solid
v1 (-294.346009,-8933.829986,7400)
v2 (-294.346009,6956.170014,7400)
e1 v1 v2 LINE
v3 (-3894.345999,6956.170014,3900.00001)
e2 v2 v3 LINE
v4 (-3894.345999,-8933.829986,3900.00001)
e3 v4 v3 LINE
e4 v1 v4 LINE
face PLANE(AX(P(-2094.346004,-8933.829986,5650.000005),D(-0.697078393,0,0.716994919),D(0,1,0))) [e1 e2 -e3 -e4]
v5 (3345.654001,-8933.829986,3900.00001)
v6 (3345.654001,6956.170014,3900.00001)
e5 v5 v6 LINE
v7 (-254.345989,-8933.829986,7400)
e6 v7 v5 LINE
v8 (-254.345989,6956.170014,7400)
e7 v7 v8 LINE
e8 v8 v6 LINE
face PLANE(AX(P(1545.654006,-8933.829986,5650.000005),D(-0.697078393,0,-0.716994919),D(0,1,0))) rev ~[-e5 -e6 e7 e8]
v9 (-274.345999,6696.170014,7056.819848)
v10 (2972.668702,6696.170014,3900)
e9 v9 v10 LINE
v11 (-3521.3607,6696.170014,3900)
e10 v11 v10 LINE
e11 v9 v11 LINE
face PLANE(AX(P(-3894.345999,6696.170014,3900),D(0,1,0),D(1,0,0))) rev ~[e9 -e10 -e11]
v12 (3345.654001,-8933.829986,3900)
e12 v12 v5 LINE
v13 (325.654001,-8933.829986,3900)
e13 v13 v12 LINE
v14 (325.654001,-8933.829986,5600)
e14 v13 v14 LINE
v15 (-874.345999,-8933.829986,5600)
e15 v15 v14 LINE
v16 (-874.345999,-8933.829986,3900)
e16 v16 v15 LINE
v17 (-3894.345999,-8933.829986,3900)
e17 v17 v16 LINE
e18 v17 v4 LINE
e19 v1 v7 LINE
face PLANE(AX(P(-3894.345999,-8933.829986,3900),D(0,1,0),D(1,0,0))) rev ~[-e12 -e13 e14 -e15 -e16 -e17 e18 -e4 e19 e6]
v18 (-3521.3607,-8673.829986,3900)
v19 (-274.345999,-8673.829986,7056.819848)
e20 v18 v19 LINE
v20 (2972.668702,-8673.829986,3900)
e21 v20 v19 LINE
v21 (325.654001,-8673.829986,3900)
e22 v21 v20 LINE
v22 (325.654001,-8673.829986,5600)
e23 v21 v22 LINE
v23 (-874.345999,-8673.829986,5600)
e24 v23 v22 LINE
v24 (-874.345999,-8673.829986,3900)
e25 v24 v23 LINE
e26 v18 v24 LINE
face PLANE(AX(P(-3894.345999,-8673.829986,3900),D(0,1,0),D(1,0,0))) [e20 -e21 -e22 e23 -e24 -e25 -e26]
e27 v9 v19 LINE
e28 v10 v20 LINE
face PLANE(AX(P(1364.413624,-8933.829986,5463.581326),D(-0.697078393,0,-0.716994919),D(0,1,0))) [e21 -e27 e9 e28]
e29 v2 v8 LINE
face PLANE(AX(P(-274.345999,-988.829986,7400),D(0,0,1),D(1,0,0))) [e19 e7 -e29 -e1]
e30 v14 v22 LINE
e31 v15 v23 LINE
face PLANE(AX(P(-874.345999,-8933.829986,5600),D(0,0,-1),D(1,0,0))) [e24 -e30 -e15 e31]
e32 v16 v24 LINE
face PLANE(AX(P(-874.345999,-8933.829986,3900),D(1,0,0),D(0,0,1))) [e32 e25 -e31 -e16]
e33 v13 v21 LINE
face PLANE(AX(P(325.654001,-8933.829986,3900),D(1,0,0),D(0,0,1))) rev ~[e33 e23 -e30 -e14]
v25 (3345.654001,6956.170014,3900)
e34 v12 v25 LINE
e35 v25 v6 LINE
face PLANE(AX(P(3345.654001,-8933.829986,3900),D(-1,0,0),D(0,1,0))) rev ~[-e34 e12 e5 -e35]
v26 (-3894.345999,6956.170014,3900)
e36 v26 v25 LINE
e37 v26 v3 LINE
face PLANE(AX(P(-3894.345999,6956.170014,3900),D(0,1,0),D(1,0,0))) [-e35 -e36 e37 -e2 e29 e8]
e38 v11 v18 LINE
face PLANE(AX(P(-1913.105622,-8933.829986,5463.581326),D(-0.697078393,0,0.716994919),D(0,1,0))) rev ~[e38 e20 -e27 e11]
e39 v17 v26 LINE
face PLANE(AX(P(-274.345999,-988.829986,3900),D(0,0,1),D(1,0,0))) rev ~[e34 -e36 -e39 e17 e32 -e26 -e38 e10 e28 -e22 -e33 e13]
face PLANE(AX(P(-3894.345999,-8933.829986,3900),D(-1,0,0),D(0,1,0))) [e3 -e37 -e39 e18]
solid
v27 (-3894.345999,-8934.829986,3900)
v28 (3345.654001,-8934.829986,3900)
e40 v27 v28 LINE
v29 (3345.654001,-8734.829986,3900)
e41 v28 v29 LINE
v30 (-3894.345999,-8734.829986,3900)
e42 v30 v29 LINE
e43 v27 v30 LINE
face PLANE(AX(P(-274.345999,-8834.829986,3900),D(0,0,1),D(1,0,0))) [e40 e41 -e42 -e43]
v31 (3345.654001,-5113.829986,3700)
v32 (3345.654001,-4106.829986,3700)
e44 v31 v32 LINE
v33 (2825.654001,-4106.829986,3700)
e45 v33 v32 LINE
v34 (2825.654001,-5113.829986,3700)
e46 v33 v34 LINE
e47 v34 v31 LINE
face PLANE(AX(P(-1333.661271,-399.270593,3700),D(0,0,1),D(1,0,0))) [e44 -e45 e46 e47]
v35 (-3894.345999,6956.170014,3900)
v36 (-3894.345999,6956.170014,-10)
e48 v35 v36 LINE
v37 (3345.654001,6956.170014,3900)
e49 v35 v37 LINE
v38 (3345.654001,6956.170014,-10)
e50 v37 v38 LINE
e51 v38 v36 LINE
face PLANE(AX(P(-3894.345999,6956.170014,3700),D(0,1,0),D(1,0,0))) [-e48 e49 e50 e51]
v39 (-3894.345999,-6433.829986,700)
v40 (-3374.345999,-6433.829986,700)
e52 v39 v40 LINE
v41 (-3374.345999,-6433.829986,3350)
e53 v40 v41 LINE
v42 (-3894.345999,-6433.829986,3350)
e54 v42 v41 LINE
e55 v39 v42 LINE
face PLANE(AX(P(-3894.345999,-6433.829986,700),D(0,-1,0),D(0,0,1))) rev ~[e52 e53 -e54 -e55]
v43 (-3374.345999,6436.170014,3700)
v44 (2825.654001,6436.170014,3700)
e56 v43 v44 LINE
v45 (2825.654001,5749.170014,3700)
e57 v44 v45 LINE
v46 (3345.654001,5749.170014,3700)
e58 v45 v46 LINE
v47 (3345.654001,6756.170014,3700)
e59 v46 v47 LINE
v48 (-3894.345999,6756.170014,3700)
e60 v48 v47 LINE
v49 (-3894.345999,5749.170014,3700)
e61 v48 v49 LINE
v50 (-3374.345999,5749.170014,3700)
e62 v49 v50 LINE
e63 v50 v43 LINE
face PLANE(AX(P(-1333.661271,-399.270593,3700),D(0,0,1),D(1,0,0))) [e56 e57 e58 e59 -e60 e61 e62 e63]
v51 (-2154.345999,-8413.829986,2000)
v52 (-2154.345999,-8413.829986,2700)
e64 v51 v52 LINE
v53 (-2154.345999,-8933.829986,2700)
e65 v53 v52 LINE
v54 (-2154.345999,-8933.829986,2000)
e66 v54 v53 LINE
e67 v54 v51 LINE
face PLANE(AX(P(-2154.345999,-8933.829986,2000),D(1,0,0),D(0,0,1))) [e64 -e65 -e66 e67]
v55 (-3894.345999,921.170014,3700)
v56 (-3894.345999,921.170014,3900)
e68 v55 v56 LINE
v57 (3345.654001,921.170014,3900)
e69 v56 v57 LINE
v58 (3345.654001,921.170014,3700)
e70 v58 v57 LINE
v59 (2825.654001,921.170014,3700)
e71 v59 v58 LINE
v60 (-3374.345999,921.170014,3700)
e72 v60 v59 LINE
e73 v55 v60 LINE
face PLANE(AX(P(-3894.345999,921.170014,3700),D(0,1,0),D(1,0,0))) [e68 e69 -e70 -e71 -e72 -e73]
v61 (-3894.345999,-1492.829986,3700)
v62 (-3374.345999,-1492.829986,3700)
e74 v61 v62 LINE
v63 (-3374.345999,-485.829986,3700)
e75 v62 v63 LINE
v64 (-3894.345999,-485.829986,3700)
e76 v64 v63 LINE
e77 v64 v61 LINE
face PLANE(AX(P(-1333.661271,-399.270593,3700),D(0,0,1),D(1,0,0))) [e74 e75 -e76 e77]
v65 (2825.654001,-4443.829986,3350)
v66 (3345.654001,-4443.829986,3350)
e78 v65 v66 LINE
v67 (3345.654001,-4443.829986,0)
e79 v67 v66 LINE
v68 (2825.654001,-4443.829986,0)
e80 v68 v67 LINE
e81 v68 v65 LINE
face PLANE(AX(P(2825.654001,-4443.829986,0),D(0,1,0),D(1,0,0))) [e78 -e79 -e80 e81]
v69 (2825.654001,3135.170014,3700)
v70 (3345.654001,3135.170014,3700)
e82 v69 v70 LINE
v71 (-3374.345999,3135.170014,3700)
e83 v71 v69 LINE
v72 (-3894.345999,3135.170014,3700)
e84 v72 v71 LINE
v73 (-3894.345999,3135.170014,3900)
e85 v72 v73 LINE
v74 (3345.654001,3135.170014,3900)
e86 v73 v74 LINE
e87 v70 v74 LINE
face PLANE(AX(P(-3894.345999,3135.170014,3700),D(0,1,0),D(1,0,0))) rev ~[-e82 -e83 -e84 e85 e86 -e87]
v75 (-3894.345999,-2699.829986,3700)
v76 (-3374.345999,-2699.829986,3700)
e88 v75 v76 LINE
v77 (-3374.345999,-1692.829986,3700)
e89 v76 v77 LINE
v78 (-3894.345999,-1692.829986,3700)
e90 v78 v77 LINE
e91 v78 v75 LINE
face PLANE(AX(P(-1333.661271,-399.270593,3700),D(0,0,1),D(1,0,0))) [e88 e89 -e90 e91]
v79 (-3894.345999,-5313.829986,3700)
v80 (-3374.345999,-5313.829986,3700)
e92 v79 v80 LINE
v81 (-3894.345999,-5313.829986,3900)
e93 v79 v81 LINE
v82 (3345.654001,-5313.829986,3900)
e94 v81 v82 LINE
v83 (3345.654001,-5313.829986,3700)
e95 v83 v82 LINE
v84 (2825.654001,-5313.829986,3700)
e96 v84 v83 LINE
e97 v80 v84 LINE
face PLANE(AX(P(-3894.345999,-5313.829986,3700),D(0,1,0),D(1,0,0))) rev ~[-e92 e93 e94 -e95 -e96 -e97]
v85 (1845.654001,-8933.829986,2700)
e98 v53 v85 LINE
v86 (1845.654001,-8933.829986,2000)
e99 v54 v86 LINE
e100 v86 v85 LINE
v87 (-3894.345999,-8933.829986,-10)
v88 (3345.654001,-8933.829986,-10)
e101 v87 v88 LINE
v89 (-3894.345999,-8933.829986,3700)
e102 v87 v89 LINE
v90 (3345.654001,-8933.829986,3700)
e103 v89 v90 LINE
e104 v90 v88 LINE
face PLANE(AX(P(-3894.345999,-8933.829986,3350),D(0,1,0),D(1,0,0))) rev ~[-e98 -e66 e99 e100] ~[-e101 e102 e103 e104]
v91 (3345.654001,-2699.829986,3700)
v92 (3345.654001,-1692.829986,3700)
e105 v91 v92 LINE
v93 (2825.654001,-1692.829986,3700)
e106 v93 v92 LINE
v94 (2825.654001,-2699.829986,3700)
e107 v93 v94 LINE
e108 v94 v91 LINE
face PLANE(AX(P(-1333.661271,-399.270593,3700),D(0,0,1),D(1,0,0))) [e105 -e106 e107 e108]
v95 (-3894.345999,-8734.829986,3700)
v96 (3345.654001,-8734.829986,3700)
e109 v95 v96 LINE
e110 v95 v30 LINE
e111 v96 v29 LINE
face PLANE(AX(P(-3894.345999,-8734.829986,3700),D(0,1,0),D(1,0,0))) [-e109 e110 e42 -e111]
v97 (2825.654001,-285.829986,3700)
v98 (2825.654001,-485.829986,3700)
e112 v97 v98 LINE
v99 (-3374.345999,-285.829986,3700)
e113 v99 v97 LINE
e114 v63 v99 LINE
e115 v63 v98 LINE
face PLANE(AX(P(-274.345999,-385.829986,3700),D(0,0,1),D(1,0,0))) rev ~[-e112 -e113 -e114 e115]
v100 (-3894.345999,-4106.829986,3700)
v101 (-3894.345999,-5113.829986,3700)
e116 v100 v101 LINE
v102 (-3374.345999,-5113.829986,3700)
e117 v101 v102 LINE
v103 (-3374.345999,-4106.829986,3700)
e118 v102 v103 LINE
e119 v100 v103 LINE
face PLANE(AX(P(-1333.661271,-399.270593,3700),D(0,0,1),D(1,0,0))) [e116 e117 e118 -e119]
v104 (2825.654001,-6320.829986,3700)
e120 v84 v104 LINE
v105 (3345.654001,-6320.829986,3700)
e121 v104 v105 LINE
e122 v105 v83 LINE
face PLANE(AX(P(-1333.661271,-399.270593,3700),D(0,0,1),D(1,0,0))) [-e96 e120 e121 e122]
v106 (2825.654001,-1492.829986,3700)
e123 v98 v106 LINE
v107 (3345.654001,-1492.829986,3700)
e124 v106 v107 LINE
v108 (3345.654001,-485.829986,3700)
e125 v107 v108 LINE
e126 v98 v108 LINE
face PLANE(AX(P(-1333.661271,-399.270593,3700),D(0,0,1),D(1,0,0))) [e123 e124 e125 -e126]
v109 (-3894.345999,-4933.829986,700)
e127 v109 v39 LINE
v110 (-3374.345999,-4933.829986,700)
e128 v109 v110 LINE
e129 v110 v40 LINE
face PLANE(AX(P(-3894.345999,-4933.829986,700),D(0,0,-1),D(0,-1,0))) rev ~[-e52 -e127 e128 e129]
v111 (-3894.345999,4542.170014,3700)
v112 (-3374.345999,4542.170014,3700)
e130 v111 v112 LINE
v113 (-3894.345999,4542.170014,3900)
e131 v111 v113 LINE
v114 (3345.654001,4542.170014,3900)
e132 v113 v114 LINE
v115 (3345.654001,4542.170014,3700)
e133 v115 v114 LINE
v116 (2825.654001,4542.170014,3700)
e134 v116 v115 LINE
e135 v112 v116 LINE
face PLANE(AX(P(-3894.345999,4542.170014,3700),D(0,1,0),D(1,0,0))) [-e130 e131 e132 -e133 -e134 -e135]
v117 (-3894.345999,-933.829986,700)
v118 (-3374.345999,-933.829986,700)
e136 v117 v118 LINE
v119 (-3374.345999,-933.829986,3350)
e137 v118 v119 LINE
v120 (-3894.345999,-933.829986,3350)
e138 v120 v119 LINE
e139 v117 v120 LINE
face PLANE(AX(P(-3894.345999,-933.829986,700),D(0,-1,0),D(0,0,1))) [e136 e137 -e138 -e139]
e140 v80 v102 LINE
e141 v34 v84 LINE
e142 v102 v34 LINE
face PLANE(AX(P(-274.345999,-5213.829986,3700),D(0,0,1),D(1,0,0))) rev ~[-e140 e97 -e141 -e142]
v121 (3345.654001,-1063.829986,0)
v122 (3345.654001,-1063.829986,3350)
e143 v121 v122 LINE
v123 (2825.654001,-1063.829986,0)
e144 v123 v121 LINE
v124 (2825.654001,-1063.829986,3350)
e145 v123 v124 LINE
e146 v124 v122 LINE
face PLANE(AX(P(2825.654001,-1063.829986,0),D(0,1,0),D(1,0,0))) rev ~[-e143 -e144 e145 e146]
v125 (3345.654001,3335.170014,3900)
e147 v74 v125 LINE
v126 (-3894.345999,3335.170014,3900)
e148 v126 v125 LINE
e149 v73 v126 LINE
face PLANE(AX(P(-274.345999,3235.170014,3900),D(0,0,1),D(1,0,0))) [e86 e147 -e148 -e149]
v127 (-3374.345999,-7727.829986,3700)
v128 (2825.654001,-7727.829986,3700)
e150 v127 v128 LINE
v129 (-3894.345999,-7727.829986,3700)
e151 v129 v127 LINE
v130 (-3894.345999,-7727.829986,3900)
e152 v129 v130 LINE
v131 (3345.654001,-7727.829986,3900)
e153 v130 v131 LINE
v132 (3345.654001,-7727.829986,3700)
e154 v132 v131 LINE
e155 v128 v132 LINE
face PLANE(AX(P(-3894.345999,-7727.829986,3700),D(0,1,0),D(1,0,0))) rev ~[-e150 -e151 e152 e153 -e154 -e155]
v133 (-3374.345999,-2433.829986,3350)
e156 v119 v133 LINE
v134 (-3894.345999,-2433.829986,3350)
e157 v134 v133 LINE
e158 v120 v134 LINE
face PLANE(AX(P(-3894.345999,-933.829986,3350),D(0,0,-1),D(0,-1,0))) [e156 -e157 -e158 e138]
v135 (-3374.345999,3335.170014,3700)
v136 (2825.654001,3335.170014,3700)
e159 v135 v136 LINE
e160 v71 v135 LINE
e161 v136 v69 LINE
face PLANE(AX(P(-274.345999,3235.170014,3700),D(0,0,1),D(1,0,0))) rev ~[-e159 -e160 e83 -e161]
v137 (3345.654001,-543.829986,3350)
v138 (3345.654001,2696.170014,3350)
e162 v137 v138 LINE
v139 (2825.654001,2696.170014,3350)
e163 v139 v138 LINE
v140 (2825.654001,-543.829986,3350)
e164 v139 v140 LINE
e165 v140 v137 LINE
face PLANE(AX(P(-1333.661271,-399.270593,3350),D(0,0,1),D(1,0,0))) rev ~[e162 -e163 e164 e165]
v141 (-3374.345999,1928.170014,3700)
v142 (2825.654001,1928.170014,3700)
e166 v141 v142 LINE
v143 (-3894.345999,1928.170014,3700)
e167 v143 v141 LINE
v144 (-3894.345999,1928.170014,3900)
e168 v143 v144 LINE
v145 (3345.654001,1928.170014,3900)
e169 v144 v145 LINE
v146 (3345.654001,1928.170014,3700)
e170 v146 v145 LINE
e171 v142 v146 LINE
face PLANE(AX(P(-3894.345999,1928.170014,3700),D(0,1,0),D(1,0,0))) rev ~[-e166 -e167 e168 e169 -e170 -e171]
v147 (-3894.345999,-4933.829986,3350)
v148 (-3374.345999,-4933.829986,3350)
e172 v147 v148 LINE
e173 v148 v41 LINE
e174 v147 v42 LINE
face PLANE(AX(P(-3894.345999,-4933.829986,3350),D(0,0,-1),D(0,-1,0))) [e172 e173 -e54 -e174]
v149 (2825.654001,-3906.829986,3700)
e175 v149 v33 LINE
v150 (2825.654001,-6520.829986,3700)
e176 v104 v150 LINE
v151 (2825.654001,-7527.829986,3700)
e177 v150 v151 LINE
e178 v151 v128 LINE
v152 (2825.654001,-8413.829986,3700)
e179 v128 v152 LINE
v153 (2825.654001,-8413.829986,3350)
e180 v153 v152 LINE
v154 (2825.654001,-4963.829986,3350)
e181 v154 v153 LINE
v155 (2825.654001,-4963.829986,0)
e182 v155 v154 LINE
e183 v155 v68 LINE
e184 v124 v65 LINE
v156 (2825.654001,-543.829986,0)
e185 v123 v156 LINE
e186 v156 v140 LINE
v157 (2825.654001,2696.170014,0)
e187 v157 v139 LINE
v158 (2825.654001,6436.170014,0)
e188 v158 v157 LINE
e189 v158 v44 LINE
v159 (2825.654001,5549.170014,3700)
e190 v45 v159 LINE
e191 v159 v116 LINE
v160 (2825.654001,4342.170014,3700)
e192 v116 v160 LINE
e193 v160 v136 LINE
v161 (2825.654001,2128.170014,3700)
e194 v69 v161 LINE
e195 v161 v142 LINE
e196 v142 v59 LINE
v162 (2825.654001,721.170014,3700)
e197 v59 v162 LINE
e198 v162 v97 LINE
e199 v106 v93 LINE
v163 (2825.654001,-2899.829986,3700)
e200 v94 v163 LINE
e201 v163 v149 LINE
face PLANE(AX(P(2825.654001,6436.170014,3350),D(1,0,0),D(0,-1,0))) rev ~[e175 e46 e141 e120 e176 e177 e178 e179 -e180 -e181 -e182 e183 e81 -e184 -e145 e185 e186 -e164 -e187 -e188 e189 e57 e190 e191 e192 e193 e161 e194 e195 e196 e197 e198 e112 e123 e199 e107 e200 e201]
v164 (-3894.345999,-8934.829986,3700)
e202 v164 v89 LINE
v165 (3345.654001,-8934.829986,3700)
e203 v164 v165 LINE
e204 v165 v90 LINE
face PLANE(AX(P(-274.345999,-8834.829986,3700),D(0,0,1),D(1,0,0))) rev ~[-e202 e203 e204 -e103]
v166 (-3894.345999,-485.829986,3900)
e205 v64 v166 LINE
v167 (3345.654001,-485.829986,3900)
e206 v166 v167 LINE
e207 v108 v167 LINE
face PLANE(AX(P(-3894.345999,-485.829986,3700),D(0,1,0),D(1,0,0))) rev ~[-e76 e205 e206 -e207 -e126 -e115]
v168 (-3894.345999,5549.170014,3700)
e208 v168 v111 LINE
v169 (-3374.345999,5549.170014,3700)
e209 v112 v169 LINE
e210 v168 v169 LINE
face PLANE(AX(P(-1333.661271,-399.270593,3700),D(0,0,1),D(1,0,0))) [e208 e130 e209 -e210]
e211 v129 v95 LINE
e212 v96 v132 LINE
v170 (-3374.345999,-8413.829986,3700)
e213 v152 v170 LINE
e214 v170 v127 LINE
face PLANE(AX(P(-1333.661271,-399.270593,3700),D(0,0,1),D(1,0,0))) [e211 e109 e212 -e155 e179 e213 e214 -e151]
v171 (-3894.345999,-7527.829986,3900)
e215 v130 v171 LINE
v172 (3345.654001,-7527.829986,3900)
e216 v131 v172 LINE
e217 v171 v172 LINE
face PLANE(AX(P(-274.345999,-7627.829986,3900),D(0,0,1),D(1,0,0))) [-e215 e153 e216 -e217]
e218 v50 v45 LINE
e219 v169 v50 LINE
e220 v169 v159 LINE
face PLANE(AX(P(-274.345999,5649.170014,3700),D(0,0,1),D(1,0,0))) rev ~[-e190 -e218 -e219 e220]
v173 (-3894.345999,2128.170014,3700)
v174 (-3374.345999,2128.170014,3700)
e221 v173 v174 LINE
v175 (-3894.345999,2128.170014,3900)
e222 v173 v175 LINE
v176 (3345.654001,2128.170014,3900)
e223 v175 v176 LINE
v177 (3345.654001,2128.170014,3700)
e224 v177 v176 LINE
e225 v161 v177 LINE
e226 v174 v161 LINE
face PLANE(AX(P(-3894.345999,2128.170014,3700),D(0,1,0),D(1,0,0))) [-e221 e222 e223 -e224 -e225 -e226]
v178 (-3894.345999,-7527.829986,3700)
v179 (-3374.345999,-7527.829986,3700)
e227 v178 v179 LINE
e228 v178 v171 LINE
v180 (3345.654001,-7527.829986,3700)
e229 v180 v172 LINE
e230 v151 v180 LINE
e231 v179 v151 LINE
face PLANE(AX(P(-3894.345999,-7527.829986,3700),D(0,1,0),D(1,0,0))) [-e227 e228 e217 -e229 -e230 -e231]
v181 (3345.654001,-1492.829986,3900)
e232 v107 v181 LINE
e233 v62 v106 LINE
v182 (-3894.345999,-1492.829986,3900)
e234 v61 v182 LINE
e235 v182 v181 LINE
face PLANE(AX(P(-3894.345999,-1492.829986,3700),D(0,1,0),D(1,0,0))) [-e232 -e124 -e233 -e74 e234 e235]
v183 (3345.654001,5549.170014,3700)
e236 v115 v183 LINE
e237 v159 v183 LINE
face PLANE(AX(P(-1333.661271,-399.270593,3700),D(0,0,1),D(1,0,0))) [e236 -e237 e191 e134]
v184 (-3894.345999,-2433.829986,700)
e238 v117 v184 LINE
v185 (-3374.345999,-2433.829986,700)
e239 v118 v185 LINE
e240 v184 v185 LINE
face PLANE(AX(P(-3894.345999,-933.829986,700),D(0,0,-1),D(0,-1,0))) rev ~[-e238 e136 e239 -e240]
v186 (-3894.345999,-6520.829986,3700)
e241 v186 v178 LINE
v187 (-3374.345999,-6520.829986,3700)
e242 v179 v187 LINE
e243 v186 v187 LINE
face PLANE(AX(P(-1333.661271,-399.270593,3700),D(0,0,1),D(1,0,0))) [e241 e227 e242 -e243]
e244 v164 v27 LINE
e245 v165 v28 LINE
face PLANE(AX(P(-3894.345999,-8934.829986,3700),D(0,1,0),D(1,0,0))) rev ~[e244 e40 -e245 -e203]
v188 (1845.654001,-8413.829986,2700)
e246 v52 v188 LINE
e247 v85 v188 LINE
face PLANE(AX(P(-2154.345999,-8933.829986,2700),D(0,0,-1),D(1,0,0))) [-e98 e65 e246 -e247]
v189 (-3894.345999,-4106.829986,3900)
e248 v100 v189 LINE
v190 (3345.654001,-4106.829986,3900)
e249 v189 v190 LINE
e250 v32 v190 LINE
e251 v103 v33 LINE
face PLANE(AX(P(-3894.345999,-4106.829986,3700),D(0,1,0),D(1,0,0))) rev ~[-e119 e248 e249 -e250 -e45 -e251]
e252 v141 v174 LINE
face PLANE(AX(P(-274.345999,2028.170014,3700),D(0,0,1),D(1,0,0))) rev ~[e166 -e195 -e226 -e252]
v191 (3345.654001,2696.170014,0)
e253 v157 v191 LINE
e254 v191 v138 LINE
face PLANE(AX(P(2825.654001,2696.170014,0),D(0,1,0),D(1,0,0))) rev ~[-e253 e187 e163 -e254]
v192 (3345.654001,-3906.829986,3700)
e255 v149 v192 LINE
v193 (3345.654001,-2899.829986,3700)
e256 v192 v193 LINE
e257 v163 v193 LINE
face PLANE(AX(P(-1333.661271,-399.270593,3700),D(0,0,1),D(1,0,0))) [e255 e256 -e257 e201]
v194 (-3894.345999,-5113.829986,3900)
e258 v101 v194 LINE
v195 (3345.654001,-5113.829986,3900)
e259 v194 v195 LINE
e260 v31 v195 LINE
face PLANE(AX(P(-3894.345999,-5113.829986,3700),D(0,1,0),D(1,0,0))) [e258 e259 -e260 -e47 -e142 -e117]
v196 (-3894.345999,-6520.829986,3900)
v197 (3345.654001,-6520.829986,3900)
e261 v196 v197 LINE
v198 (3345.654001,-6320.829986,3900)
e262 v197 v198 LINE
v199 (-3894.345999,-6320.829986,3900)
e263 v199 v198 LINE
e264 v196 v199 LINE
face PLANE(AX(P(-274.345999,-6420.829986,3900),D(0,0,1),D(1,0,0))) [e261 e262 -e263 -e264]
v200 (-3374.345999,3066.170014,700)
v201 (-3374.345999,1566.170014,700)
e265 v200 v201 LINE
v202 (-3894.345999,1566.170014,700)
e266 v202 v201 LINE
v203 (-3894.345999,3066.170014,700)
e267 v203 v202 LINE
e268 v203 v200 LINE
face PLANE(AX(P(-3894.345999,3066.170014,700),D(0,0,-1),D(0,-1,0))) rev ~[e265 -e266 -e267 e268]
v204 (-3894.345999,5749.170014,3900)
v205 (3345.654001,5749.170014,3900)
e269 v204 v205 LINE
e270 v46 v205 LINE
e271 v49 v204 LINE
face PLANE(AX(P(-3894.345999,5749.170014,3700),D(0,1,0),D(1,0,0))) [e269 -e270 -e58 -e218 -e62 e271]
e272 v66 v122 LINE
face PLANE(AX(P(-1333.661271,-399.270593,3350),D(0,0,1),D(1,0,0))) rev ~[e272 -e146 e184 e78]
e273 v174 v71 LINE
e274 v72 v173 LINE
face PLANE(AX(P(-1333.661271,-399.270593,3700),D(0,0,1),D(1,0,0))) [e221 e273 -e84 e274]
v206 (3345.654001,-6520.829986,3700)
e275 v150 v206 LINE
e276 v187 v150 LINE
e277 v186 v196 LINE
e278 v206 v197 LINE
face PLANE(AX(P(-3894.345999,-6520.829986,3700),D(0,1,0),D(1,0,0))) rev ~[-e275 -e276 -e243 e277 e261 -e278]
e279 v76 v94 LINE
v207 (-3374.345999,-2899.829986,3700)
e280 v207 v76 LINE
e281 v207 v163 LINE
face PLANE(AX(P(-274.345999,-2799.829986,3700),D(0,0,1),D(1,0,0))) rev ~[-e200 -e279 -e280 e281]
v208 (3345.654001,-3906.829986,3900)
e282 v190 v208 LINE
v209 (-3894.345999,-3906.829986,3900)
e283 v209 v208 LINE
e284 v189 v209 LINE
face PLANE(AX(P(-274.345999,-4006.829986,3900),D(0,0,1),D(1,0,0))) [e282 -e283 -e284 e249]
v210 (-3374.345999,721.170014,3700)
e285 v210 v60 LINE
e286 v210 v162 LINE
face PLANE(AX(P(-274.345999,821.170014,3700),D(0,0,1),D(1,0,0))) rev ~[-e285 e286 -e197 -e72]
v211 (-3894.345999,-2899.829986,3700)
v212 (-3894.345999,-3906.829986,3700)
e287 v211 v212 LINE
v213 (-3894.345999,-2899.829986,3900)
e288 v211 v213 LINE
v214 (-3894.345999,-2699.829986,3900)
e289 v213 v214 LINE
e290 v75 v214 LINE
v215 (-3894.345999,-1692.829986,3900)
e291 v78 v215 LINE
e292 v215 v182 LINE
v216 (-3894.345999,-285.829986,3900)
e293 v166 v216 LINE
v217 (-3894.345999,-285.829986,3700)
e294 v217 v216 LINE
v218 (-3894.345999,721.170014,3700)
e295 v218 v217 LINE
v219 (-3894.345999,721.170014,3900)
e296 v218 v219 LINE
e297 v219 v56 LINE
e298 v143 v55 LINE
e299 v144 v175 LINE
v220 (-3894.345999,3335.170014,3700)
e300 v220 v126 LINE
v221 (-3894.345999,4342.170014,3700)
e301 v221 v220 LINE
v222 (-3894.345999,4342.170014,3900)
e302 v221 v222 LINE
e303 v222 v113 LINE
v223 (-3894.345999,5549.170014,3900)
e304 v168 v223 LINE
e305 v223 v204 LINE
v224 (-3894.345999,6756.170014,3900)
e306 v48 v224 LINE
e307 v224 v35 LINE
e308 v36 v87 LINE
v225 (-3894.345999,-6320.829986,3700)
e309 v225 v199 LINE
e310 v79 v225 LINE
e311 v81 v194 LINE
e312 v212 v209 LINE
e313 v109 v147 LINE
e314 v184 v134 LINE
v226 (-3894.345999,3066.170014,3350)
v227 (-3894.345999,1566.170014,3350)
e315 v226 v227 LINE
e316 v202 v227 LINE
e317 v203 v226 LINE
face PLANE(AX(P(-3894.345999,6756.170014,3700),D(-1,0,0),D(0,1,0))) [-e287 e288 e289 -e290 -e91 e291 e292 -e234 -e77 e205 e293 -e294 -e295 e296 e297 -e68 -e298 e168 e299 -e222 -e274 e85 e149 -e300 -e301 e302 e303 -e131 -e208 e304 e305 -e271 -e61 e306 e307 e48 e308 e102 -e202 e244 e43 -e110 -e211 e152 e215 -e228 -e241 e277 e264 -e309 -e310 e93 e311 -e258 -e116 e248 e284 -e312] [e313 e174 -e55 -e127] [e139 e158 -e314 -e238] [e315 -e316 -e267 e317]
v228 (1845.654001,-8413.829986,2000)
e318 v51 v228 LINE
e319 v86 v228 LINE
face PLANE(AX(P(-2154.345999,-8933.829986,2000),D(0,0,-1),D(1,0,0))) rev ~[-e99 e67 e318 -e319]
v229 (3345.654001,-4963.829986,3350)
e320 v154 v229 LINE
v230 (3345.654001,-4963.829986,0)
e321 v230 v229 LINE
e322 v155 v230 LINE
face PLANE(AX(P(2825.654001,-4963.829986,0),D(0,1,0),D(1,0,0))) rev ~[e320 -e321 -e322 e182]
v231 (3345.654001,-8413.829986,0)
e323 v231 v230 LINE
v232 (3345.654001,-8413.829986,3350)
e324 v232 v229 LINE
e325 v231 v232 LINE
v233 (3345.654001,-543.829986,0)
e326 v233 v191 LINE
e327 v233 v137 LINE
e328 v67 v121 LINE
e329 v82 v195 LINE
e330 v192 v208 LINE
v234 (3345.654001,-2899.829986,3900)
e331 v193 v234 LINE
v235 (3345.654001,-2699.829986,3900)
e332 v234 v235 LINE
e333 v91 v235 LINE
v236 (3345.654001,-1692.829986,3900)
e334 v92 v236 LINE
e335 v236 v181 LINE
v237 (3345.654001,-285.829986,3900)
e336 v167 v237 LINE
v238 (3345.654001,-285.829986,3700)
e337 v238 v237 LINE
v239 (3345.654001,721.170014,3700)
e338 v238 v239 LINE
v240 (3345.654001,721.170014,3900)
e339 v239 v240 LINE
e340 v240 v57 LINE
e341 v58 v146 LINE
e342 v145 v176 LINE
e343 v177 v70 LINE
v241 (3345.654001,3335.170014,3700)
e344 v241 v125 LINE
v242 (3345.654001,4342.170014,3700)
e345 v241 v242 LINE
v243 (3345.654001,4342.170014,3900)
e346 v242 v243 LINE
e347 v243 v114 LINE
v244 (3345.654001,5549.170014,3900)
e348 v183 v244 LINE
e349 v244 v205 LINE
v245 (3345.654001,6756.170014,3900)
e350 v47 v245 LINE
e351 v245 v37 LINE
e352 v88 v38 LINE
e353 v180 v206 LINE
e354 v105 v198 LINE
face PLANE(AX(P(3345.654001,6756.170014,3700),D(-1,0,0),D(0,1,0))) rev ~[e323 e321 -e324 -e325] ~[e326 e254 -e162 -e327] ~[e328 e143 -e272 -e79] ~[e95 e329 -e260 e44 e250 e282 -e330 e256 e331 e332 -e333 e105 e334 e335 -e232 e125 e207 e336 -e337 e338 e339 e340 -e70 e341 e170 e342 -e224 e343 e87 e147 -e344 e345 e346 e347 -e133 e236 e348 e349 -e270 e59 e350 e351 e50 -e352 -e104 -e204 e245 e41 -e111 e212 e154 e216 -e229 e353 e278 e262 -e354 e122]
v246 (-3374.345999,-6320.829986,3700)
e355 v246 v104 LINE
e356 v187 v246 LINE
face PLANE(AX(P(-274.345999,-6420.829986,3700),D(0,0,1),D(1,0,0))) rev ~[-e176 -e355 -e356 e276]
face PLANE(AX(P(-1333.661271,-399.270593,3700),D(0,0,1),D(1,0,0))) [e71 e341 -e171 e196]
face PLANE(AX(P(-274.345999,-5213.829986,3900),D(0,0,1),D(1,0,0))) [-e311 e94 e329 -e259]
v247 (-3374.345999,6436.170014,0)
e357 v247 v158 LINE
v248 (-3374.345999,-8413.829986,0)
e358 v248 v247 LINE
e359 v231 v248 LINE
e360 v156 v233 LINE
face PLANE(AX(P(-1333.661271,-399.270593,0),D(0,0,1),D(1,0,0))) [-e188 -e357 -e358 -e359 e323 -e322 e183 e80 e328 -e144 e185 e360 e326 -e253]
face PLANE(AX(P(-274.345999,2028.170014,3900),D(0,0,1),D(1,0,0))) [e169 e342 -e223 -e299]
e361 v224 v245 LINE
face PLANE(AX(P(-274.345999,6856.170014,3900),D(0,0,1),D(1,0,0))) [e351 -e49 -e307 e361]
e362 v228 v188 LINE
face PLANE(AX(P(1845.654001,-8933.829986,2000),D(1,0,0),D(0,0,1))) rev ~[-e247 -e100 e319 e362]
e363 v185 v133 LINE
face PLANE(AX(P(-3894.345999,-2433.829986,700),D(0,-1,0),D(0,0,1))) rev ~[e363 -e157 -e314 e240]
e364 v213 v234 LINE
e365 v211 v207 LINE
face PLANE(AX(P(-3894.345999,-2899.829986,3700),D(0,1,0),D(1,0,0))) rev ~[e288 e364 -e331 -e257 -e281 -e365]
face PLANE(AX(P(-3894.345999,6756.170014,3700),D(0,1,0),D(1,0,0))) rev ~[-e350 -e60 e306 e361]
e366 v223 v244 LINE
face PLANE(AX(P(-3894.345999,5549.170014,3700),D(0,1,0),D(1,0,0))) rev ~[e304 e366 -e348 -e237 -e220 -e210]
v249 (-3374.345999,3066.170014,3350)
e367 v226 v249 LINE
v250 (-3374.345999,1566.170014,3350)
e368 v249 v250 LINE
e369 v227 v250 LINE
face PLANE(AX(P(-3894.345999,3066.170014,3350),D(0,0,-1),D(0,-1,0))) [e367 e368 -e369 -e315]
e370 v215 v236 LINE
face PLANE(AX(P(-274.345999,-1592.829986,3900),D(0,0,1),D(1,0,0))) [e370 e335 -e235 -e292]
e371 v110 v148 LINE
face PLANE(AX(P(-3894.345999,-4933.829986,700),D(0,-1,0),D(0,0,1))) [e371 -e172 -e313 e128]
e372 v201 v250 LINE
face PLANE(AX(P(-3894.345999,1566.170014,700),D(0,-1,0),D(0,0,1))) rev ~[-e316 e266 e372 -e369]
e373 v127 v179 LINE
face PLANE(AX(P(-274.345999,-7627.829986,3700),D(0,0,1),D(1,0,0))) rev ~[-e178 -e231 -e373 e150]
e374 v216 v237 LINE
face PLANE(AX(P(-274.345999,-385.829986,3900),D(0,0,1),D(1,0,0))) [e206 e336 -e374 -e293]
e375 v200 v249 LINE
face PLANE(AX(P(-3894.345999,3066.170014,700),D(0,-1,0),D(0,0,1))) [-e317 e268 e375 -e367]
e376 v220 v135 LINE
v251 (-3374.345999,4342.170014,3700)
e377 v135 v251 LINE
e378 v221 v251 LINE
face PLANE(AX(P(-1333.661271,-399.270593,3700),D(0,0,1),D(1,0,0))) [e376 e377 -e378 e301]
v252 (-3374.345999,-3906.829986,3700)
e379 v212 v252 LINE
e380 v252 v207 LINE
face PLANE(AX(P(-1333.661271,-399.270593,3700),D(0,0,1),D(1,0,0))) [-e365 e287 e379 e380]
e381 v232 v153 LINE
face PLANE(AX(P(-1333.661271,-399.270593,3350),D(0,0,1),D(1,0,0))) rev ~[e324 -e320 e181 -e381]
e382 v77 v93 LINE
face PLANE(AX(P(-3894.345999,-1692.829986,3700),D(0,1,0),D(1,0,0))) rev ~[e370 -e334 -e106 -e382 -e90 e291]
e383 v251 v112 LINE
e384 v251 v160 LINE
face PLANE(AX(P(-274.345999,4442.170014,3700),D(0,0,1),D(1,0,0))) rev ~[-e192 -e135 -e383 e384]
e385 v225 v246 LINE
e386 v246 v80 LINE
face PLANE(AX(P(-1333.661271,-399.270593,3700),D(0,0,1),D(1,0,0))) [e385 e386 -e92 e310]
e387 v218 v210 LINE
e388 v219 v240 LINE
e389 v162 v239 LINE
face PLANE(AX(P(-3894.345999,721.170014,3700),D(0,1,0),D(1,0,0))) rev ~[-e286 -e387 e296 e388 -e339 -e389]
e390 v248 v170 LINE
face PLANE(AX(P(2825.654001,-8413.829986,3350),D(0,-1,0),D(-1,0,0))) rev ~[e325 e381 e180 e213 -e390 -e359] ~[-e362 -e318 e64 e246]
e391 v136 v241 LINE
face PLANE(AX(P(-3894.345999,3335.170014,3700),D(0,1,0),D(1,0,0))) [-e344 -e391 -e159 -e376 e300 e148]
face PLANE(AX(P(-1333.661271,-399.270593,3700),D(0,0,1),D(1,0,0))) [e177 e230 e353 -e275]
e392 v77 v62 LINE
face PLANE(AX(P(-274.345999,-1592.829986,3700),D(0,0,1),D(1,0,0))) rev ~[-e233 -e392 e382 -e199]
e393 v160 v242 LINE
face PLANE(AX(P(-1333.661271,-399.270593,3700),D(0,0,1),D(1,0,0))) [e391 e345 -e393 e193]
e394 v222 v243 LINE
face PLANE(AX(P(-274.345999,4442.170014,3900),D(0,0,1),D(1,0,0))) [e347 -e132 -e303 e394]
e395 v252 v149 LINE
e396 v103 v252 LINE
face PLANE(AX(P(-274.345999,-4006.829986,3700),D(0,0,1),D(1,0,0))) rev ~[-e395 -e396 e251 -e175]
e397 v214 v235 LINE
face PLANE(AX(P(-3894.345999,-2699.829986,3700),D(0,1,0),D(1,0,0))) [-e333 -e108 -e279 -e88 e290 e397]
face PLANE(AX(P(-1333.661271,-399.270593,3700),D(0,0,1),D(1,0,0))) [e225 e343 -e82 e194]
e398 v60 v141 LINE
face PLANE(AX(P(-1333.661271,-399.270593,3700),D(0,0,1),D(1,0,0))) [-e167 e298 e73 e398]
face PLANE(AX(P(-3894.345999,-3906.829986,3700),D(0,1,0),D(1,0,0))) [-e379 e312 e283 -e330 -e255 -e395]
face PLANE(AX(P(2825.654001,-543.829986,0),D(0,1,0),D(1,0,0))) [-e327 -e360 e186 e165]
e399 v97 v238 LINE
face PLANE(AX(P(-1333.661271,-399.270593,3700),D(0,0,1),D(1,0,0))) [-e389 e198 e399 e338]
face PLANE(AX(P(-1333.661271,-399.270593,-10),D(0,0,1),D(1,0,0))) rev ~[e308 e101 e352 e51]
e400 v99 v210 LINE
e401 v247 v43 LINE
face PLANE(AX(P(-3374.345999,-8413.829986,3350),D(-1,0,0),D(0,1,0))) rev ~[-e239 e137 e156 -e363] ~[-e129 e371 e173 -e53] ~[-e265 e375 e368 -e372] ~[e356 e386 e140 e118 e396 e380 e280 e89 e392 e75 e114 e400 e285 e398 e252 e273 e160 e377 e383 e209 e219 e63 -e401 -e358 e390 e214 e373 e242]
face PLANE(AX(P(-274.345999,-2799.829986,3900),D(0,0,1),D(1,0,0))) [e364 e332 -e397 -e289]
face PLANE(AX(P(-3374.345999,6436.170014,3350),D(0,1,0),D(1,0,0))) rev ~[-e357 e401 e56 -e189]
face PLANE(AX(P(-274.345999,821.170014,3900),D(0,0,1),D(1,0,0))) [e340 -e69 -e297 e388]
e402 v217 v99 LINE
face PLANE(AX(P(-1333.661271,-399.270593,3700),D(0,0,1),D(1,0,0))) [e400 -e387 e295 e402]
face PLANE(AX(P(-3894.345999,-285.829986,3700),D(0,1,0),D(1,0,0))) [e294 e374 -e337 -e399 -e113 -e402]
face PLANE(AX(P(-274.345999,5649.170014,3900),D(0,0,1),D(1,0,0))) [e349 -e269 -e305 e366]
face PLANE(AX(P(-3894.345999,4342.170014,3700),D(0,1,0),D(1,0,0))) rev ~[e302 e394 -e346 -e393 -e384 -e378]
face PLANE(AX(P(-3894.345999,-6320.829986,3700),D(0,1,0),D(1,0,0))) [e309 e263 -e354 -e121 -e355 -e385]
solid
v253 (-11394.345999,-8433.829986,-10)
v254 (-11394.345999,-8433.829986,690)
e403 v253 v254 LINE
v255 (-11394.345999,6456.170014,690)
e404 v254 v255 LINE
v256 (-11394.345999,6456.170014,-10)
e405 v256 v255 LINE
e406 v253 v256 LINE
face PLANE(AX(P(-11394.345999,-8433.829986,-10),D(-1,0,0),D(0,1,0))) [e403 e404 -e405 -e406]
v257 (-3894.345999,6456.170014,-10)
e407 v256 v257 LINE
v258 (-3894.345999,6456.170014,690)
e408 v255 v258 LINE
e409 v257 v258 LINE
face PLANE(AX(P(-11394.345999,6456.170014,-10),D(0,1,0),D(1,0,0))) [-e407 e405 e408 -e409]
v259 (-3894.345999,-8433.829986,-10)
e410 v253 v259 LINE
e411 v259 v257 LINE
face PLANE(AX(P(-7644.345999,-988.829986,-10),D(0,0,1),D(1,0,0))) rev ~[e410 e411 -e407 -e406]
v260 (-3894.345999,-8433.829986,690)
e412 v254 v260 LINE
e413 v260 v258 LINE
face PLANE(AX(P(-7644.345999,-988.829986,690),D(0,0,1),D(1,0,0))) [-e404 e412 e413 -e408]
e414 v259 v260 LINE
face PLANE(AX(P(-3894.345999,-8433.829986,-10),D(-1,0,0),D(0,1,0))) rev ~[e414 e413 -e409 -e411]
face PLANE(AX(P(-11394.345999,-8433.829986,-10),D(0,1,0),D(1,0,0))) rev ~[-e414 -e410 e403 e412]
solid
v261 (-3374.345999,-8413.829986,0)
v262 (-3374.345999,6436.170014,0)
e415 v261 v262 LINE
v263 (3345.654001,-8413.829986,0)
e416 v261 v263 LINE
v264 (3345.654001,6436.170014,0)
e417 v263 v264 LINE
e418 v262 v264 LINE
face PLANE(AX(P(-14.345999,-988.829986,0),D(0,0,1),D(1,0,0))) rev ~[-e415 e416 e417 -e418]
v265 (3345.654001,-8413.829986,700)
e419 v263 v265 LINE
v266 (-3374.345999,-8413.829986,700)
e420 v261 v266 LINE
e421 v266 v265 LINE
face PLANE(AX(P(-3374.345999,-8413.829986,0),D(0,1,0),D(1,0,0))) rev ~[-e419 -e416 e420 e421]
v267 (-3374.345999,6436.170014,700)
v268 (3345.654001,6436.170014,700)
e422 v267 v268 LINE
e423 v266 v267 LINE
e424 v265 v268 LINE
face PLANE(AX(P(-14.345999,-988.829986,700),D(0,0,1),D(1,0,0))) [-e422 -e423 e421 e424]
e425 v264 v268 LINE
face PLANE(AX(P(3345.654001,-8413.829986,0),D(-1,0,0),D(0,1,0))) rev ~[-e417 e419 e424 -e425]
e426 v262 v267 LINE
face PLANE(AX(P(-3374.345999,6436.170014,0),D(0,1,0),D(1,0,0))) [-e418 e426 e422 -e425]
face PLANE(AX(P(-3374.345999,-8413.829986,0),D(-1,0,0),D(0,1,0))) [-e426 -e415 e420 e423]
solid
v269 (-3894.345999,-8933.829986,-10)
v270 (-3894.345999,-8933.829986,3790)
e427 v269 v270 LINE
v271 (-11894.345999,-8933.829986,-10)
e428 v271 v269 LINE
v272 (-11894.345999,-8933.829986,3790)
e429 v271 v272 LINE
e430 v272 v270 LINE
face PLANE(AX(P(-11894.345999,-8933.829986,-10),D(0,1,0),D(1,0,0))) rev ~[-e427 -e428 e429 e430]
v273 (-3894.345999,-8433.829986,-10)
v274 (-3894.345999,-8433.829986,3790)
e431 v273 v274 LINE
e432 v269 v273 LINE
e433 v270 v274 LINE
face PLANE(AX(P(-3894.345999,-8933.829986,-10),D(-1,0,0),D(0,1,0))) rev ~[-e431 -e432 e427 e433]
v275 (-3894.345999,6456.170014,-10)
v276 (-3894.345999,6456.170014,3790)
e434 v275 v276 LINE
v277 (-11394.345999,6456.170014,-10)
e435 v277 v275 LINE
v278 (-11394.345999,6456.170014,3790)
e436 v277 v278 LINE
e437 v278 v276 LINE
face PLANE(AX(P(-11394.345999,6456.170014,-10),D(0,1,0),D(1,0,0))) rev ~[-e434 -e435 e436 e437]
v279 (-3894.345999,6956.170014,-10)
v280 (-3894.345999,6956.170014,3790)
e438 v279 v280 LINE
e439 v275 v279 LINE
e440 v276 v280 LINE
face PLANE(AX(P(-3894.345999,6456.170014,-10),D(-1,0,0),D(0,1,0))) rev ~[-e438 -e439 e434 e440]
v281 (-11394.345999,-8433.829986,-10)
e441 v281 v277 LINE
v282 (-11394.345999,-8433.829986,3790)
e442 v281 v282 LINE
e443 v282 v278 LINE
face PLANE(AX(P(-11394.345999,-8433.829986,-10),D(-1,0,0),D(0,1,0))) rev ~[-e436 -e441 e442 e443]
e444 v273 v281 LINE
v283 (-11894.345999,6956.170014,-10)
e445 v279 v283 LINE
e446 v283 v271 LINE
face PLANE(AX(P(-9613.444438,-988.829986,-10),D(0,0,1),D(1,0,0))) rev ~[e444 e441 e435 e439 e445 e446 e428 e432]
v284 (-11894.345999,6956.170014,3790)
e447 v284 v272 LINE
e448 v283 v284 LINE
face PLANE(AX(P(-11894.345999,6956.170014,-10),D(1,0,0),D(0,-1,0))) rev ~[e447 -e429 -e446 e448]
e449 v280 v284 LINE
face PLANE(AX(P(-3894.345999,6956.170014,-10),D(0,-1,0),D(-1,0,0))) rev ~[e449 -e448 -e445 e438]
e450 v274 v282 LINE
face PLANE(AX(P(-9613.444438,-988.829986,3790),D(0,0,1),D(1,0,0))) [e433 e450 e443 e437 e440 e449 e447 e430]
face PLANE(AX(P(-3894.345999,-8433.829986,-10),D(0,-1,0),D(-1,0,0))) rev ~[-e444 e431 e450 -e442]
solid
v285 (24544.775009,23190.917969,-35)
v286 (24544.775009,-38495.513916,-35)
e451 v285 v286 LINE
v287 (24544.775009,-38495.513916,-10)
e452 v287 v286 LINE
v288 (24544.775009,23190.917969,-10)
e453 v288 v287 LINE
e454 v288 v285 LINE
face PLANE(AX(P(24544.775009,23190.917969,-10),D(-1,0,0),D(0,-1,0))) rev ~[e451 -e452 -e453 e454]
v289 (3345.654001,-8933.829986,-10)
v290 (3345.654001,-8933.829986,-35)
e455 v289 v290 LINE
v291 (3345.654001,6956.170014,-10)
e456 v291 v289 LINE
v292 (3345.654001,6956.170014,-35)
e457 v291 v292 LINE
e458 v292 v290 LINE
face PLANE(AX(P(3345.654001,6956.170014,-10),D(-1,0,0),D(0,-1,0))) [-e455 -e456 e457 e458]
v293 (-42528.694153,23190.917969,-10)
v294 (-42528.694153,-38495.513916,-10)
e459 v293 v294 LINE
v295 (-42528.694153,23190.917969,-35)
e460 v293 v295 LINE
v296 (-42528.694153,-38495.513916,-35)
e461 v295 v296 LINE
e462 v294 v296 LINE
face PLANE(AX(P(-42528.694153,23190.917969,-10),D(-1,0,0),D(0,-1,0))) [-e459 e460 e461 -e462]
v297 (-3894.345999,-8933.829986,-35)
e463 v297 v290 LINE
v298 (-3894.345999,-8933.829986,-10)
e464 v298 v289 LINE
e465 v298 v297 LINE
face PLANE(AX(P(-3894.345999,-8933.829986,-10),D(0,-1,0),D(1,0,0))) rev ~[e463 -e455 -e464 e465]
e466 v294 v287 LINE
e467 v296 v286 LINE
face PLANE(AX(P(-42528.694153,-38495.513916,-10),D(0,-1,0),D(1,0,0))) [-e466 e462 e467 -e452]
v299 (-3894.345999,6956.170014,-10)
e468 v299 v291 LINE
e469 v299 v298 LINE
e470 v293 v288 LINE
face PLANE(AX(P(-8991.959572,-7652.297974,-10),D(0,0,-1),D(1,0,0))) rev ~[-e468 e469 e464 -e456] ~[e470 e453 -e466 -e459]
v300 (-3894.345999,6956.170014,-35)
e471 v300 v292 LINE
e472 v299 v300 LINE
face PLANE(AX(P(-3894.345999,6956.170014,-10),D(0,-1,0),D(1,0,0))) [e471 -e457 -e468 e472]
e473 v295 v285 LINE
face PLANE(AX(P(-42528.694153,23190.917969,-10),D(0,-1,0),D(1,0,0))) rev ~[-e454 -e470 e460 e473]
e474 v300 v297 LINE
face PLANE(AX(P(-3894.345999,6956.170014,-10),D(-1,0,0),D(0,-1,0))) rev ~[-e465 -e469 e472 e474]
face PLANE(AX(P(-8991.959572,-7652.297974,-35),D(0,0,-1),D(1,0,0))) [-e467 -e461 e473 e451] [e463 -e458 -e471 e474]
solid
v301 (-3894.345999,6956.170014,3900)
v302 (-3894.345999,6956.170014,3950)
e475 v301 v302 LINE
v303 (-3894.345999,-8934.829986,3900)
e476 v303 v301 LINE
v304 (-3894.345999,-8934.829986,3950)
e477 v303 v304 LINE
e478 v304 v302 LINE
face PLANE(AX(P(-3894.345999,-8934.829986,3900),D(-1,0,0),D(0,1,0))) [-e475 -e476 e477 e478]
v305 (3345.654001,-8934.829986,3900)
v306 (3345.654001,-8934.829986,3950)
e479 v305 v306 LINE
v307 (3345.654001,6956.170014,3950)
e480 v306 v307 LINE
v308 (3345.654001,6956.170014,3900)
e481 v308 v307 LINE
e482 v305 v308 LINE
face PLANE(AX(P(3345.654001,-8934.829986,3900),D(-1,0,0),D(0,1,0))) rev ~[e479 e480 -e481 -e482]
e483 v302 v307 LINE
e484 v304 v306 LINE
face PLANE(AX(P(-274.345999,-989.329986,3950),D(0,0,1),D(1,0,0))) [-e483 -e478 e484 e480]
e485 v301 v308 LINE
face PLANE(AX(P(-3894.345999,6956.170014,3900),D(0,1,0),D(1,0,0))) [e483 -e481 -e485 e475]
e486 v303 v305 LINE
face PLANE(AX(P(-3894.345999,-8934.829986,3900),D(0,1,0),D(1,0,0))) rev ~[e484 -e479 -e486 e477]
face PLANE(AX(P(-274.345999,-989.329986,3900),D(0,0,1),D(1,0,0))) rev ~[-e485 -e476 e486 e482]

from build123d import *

# Parameters (mm, degrees)
F0_W      = 520
F0_H      = 3240
F0_H_2    = 520
F0_H_3    = 3380
F0_H_4    = 3450
F1_DEPTH  = 10
F2_DEPTH  = 3350
F3_W      = 520
F3_H      = 11110
F4_DEPTH  = 350
F5_W      = 7240
F5_H      = 200
F6_DEPTH  = 200
F7_W      = 7240
F7_H      = 15890
F8_DEPTH  = 3500
F9_SIZE2  = 3499.99999
F9_SIZE   = 3599.99999
F10_T     = 260
F11_W     = 1200
F11_H     = 1700
F12_DEPTH = 260
F13_W     = 6720
F13_H     = 14850
F14_DEPTH = 700
F15_W     = 7240
F15_H     = 15891
F16_DEPTH = 50
F17_W     = 1500
F17_H     = 2650
F18_DEPTH = 520
F19_W     = 4000
F19_H     = 700
F20_DEPTH = 520
F21_W     = 67073.4691619873
F21_H     = 61686.4318847656
F21_W_2   = 7240
F21_H_2   = 15890
F22_DEPTH = 25
F24_DEPTH = 3800
F25_W     = 7500
F25_H     = 14890
F26_DEPTH = 700


# Not quite as in the source:
# - a fillet or chamfer is up to 0.001 mm smaller than in the source, because OpenCascade refuses the exact size
# - a shell that OpenCascade refuses in one call is made with other operations: the cavity is built on its own and cut out
# - a feature names something its author has since deleted; it is built from what else it names


with BuildPart() as f1:
    # F0 (on Top) → F1 (new body)
    with BuildSketch(Plane.XY):
        Polygon((-3374.345998764, -8413.8299859681), (-3374.345998764, 6436.1700140319), (2825.654001236, 6436.1700140319), (2825.654001236, 2696.170014032), (3345.654001236, 2696.170014032), (3345.654001236, 6956.1700140319), (-3894.345998764, 6956.1700140319), (-3894.345998764, -8933.8299859681), (3345.654001236, -8933.8299859681), (3345.654001236, -8413.8299859681), (2825.654001236, -8413.8299859681), align=None)
        Polygon((2825.654001236, 6436.1700140319), (-3374.345998764, 6436.1700140319), (-3374.345998764, -8413.8299859681), (2825.654001236, -8413.8299859681), (2825.654001236, -4963.8299859681), (2825.654001236, -4443.829985968), (2825.654001236, -1063.8299859681), (2825.654001236, -543.829985968), (2825.654001236, 2696.170014032), align=None)
        with Locations((3085.654001236, 1076.170014032)):
            Rectangle(F0_W, F0_H)
        with Locations((3085.654001236, -803.829985968)):
            Rectangle(F0_W, F0_H_2)
        with Locations((3085.654001236, -2753.829985968)):
            Rectangle(F0_W, F0_H_3)
        with Locations((3085.654001236, -6688.8299859681)):
            Rectangle(F0_W, F0_H_4)
        with Locations((3085.654001236, -4703.8299859681)):
            Rectangle(F0_W, F0_H_2)
    extrude(amount=-F1_DEPTH)

    # F0 (on Top) → F2 (join)
    with BuildSketch(Plane.XY):
        with Locations((3085.654001236, -803.829985968)):
            Rectangle(F0_W, F0_H_2)
        with Locations((3085.654001236, -4703.8299859681)):
            Rectangle(F0_W, F0_H_2)
        Polygon((-3374.345998764, -8413.8299859681), (-3374.345998764, 6436.1700140319), (2825.654001236, 6436.1700140319), (2825.654001236, 2696.170014032), (3345.654001236, 2696.170014032), (3345.654001236, 6956.1700140319), (-3894.345998764, 6956.1700140319), (-3894.345998764, -8933.8299859681), (3345.654001236, -8933.8299859681), (3345.654001236, -8413.8299859681), (2825.654001236, -8413.8299859681), align=None)
    extrude(amount=F2_DEPTH)

    # F3 (on face) → F4 (join)
    with BuildSketch(Plane.XY.offset(3350)):
        Polygon((3345.654001236, 6956.1700140319), (-3894.345998764, 6956.1700140319), (-3894.345998764, -8933.8299859681), (3345.654001236, -8933.8299859681), (3345.654001236, -8413.8299859681), (2825.654001236, -8413.8299859681), (-3374.345998764, -8413.8299859681), (-3374.345998764, 6436.1700140319), (2825.654001236, 6436.1700140319), (2825.654001236, 2696.170014032), (3345.654001236, 2696.170014032), align=None)
        with Locations((3085.654001236, -2858.8299859681)):
            Rectangle(F3_W, F3_H)
    extrude(amount=F4_DEPTH)

    # F5 (on face) → F6 (join)
    with BuildSketch(Plane.XY.offset(3700)):
        with Locations((-274.345998764, 6856.1700140319)):
            Rectangle(F5_W, F5_H)
        with Locations((-274.345998764, 5649.1700140319)):
            Rectangle(F5_W, F5_H)
        with Locations((-274.345998764, 4442.1700140319)):
            Rectangle(F5_W, F5_H)
        with Locations((-274.345998764, 3235.1700140319)):
            Rectangle(F5_W, F5_H)
        with Locations((-274.345998764, 2028.1700140319)):
            Rectangle(F5_W, F5_H)
        with Locations((-274.345998764, 821.1700140319)):
            Rectangle(F5_W, F5_H)
        with Locations((-274.345998764, -385.8299859681)):
            Rectangle(F5_W, F5_H)
        with Locations((-274.345998764, -1592.8299859681)):
            Rectangle(F5_W, F5_H)
        with Locations((-274.345998764, -2799.8299859681)):
            Rectangle(F5_W, F5_H)
        with Locations((-274.345998764, -4006.8299859681)):
            Rectangle(F5_W, F5_H)
        with Locations((-274.345998764, -5213.8299859681)):
            Rectangle(F5_W, F5_H)
        with Locations((-274.345998764, -6420.8299859681)):
            Rectangle(F5_W, F5_H)
        with Locations((-274.345998764, -7627.8299859681)):
            Rectangle(F5_W, F5_H)
        with Locations((-274.345998764, -8834.8299859681)):
            Rectangle(F5_W, F5_H)
    extrude(amount=F6_DEPTH)

    # F17 (on face) → F18 (cut)
    with BuildSketch(Plane(origin=(-3894.345998764, 0, 0), x_dir=(0, -1, 0), z_dir=(-1, 0, 0))):
        with Locations((5683.8299859681, 2025)):
            Rectangle(F17_W, F17_H)
        with Locations((1683.8299859681, 2025)):
            Rectangle(F17_W, F17_H)
        with Locations((-2316.1700140319, 2025)):
            Rectangle(F17_W, F17_H)
    extrude(amount=-F18_DEPTH, mode=Mode.SUBTRACT)

    # F19 (on face) → F20 (cut)
    with BuildSketch(Plane.XZ.offset(8933.8299859681)):
        with Locations((-154.345998764, 2350)):
            Rectangle(F19_W, F19_H)
    extrude(amount=-F20_DEPTH, mode=Mode.SUBTRACT)


with BuildPart() as f8:
    # F7 (on face) → F8 (new body)
    with BuildSketch(Plane.XY.offset(3900)):
        with Locations((-274.345998764, -988.8299859681)):
            Rectangle(F7_W, F7_H)
    extrude(amount=F8_DEPTH)

    # F9 (size 3600 and 3500 in the source; OpenCascade refuses exactly that, so slightly less here)
    f9_edges = [f8.edges().sort_by_distance(p)[0] for p in [
        (-3894.345999, -988.829986, 7400),
        (3345.654001, -988.829986, 7400),
    ]]
    f9_side = f8.faces().sort_by_distance((-274.345999, -988.829986, 7400))[0]
    chamfer(f9_edges, length=F9_SIZE, length2=F9_SIZE2, reference=f9_side)

    # F10: shell of thickness 260, made by hand


with BuildPart() as f10_core1:
    # F10_t2: copy of F8
    add(f8.part)

    # the walls: a layer under each face that stays
    f10_faces = [f10_core1.faces().sort_by_distance(p)[0] for p in [
        (-274.3459987642, -8933.8299859681, 5650.0000000001),
        (-3894.345998764, -988.8299859681, 3900.0000050002),
        (-2094.3460037642, -988.8299859681, 5650.0000050002),
        (-274.345998764, -988.8299859681, 7400),
        (3345.654001236, -988.8299859681, 3900.0000050002),
        (1545.6540062361, -988.8299859681, 5650.0000050002),
        (-274.3459987639, 6956.1700140319, 5650.0000000001),
    ]]
    thicken(f10_faces, amount=-F10_T, mode=Mode.SUBTRACT)


with BuildPart() as f8_1:
    add(f8.part)

    # what is left inside the walls is the cavity
    f10_cavity = [f10_core1.part.solids().sort_by_distance(p)[0] for p in [
        (-274.345999, -3550.496653, 3902.6),
    ]]
    add(f10_cavity, mode=Mode.SUBTRACT)

    # F11 (on face) → F12 (cut)
    with BuildSketch(Plane.XZ.offset(8933.8299859681)):
        with Locations((-274.345998764, 4750)):
            Rectangle(F11_W, F11_H)
    extrude(amount=-F12_DEPTH, mode=Mode.SUBTRACT)


with BuildPart() as f14:
    # F13 (on face) → F14 (new body)
    with BuildSketch(Plane.XY):
        with Locations((-14.345998764, -988.8299859681)):
            Rectangle(F13_W, F13_H)
    extrude(amount=F14_DEPTH)


with BuildPart() as f16:
    # F15 (on face) → F16 (new body)
    with BuildSketch(Plane.XY.offset(3900)):
        with Locations((-274.345998764, -989.3299859681)):
            Rectangle(F15_W, F15_H)
    extrude(amount=F16_DEPTH)


with BuildPart() as f22:
    # F21 (on face) → F22 (new body)
    with BuildSketch(Plane(origin=(0, 0, -10), x_dir=(1, 0, 0), z_dir=(0, 0, -1))):
        with Locations((-8991.9595718384, 7652.2979736328)):
            Rectangle(F21_W, F21_H)
        with Locations((-274.345998764, 988.8299859681)):
            Rectangle(F21_W_2, F21_H_2, mode=Mode.SUBTRACT)
    extrude(amount=F22_DEPTH)


with BuildPart() as f24:
    # F23 (on face) → F24 (new body)
    with BuildSketch(Plane.XY.offset(-10)):
        Polygon((-3894.345998764, 6456.1700140319), (-3894.345998764, 6956.1700140319), (-11894.345998764, 6956.1700140319), (-11894.345998764, -8933.8299859681), (-3894.345998764, -8933.8299859681), (-3894.345998764, -8433.8299859681), (-11394.345998764, -8433.8299859681), (-11394.345998764, 6456.1700140319), align=None)
    extrude(amount=F24_DEPTH)


with BuildPart() as f26:
    # F25 (on face) → F26 (new body)
    with BuildSketch(Plane.XY.offset(-10)):
        with Locations((-7644.345998764, -988.8299859681)):
            Rectangle(F25_W, F25_H)
    extrude(amount=F26_DEPTH)


solid = Compound([f1.part, f8_1.part, f14.part, f16.part, f22.part, f24.part, f26.part])
